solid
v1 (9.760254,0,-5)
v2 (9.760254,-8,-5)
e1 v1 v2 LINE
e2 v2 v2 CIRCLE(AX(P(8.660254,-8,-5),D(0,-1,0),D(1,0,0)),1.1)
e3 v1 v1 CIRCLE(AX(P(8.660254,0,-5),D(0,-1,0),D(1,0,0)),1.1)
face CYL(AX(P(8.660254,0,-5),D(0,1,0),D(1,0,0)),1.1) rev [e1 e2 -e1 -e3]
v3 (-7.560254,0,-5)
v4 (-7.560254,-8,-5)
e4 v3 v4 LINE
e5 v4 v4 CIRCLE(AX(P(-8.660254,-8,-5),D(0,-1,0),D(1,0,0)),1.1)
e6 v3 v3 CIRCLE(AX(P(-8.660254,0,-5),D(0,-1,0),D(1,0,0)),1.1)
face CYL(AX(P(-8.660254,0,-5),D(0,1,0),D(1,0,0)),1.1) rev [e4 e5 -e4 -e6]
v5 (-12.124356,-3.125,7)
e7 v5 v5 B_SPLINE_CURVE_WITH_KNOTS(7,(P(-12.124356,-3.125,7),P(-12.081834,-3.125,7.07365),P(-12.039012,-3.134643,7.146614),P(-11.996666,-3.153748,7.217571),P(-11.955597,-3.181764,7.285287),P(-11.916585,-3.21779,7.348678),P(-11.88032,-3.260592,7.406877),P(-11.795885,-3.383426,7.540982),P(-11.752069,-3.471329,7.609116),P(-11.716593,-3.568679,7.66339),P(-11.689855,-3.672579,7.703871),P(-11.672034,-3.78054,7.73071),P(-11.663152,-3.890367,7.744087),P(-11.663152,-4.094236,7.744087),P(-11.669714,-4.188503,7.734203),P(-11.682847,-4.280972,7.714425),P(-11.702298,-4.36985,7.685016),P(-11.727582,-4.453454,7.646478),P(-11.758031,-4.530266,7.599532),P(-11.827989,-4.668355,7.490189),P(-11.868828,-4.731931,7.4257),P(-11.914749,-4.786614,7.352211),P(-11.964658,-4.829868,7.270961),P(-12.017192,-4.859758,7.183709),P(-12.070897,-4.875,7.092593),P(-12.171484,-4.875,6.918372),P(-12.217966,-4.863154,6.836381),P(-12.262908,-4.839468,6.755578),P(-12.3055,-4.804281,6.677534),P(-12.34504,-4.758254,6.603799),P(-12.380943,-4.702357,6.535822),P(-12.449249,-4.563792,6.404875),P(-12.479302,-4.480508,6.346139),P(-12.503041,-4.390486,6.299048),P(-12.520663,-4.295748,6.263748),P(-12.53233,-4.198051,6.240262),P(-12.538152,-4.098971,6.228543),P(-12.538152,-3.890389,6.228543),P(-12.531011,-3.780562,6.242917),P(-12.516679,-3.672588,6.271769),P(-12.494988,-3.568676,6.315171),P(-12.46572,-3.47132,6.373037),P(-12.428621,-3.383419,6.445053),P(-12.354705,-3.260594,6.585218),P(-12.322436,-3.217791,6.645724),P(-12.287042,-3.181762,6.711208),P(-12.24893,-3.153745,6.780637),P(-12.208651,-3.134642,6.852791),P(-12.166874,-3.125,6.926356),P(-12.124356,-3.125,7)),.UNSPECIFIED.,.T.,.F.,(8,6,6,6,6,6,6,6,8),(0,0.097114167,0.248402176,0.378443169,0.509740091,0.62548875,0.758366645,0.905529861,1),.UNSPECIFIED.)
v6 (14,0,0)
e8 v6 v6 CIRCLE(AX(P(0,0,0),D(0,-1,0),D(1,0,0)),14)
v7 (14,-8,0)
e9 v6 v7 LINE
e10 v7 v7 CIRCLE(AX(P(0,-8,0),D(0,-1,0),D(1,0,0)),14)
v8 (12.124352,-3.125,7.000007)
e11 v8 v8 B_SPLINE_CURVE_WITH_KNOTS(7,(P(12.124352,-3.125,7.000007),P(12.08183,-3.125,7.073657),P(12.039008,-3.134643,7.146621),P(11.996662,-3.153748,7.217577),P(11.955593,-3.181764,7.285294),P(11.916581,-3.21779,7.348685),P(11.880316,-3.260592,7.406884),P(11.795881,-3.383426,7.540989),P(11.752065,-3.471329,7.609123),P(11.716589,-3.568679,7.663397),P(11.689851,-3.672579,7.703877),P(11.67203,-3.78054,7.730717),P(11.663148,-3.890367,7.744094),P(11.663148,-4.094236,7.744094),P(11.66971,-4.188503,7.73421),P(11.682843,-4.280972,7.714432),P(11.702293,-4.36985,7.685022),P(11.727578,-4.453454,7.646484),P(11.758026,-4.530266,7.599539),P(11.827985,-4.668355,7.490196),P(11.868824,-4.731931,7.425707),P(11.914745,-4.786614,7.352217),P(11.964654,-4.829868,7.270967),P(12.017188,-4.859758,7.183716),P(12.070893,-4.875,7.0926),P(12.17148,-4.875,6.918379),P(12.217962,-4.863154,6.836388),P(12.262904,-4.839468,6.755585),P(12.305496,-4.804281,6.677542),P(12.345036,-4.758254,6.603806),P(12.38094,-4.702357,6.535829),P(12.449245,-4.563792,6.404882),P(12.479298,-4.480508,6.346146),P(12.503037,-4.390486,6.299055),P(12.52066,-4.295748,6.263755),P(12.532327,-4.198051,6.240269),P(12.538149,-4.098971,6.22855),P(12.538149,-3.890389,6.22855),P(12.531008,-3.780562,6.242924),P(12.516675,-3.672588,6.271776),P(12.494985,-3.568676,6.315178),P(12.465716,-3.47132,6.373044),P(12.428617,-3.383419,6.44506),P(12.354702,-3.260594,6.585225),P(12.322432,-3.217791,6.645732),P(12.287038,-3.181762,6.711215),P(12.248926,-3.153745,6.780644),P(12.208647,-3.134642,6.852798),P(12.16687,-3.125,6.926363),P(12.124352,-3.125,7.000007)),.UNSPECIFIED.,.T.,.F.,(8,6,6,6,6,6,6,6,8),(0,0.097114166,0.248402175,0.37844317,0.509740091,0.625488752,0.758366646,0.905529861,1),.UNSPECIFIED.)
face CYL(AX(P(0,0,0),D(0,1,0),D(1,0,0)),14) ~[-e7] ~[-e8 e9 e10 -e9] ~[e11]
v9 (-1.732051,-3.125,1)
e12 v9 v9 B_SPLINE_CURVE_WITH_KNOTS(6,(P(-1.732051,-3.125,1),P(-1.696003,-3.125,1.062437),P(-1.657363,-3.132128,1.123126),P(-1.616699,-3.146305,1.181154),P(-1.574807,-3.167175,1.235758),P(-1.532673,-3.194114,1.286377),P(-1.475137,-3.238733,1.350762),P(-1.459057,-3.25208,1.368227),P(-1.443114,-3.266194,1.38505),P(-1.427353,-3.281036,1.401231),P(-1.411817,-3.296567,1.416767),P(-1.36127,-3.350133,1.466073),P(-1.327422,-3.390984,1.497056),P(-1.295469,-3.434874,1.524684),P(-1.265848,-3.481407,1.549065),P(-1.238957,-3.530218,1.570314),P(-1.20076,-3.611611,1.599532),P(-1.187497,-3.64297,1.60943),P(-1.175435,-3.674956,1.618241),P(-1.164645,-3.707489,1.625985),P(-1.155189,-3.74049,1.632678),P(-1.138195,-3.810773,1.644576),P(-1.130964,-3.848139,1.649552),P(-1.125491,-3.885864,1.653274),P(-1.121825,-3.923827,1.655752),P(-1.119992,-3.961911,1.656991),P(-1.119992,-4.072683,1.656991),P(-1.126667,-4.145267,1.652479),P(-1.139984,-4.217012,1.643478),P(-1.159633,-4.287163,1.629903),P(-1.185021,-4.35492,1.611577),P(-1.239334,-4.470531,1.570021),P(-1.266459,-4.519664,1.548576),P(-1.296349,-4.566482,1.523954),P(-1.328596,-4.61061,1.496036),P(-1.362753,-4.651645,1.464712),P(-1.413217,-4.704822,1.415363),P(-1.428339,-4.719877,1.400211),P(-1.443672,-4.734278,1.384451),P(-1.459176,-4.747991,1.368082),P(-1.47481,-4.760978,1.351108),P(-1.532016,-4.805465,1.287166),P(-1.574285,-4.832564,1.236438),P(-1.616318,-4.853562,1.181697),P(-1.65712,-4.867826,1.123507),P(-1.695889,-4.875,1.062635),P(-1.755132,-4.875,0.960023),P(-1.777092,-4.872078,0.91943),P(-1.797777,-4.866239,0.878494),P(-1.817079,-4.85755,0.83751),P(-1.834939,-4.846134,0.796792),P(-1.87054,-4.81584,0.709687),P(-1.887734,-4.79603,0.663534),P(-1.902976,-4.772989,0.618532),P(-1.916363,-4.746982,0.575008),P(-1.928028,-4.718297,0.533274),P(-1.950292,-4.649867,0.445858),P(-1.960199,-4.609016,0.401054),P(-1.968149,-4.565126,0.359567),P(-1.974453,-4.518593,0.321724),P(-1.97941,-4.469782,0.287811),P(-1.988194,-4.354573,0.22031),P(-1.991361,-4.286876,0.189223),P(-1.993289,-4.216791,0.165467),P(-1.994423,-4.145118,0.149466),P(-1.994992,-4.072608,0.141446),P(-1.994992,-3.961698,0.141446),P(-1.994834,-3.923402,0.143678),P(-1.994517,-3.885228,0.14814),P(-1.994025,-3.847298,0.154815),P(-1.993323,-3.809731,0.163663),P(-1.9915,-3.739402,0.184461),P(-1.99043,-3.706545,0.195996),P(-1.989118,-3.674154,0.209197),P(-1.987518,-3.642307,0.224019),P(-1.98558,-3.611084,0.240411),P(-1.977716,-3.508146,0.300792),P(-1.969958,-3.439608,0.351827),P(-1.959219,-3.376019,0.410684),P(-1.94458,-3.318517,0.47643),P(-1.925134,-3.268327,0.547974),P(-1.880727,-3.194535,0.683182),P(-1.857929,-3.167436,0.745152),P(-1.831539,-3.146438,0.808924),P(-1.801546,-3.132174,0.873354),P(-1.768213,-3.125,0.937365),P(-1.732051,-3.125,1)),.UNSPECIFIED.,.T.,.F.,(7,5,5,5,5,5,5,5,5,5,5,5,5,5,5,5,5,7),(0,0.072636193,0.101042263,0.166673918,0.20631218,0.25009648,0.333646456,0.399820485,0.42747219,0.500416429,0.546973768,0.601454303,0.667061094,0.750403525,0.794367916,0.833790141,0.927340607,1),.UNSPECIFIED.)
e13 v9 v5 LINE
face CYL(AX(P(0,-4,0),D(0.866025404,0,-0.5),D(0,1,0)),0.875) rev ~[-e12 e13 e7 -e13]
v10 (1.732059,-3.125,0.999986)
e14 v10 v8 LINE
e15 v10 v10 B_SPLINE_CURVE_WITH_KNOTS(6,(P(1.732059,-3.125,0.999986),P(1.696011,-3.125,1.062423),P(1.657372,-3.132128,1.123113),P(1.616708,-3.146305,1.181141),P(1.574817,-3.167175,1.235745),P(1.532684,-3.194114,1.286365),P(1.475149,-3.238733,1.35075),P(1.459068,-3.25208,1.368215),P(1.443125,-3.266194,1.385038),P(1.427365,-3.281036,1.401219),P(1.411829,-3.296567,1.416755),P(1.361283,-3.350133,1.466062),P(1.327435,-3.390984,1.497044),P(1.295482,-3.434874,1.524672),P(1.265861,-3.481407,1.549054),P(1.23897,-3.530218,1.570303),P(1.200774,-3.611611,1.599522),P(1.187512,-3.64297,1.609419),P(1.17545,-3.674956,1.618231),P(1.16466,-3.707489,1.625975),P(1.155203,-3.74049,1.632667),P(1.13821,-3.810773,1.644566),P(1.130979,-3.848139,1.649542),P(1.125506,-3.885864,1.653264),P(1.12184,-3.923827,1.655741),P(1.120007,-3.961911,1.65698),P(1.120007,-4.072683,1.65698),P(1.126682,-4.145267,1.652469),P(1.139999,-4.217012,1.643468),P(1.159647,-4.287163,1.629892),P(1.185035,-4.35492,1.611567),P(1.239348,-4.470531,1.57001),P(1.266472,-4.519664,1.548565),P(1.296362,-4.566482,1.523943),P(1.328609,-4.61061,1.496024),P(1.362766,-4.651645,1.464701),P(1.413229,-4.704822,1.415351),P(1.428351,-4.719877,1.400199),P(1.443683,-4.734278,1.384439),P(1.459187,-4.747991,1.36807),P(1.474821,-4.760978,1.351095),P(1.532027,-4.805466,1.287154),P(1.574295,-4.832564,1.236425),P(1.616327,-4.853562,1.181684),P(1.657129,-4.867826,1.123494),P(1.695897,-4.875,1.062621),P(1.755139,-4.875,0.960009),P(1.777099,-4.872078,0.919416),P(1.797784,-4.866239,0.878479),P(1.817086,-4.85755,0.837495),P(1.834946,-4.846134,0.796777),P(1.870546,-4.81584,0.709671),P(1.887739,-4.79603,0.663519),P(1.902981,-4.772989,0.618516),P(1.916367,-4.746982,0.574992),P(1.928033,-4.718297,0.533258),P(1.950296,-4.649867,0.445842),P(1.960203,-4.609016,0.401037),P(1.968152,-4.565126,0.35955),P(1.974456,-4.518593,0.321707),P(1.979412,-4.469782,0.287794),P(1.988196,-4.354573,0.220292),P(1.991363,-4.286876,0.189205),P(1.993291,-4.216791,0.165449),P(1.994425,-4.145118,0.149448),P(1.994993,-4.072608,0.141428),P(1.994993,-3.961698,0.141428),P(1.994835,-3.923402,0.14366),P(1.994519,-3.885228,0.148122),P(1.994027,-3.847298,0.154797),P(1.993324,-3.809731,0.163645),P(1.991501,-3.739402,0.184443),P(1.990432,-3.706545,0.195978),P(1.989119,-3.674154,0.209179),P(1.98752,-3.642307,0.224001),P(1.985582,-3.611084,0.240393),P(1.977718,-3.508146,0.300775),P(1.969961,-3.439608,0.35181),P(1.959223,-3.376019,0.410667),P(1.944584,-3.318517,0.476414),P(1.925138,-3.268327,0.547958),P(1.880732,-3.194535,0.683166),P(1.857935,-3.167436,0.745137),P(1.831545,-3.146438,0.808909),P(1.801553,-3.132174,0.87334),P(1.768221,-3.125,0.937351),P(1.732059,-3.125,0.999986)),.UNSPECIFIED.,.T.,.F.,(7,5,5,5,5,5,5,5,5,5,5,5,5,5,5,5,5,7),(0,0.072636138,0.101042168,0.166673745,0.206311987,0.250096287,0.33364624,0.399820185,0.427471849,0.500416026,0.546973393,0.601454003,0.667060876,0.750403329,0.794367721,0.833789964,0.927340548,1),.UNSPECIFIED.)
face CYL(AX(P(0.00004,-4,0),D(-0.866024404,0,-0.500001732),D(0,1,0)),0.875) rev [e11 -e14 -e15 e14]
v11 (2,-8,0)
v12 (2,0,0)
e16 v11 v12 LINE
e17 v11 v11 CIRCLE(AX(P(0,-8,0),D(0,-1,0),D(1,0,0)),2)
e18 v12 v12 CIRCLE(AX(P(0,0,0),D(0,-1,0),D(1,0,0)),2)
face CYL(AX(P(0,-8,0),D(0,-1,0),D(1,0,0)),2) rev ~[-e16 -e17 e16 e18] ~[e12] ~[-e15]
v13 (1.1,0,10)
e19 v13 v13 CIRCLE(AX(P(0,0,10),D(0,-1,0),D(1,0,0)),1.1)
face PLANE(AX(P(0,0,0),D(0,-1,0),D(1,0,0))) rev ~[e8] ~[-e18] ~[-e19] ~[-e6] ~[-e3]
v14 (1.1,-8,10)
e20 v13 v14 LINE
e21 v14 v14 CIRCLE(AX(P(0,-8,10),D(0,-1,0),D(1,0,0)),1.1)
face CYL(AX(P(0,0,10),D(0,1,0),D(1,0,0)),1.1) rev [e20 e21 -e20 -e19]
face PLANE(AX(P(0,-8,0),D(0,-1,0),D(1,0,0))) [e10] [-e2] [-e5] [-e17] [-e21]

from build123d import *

# Parameters (mm, degrees)
F0_R     = 14
F0_R_2   = 1.1
F1_DEPTH = 8
F2_R     = 2
F3_DEPTH = 8.001
F6_R     = 0.875
F7_DEPTH = 19.125355653


# Not quite as in the source:
# - a pattern or mirror of a feature is missing from the dataset's text; its kind, count and spacing are read off the source's solid


with BuildPart() as f1:
    # F0 (on Front) → F1 (new body)
    with BuildSketch(Plane.XZ):
        Circle(F0_R)
        with Locations((-8.6602540378, -5)):
            Circle(F0_R_2, mode=Mode.SUBTRACT)
        with Locations((8.6602540378, -5)):
            Circle(F0_R_2, mode=Mode.SUBTRACT)
        with Locations((0, 10)):
            Circle(F0_R_2, mode=Mode.SUBTRACT)
    extrude(amount=F1_DEPTH)

    # F2 (on face) → F3 (cut, through all)
    with BuildSketch(Plane.XZ.offset(8)):
        Circle(F2_R)
    extrude(amount=-F3_DEPTH, mode=Mode.SUBTRACT)

    # F6 (on line) → F7 (cut, through all)
    with BuildSketch(Plane(origin=(0, 0, 0), x_dir=(0, 1, 0), z_dir=(0.8660254038, 0, -0.5))):
        with Locations((-4, 0)):
            Circle(F6_R)
    f7 = extrude(amount=-F7_DEPTH, mode=Mode.SUBTRACT)

    # F7_copies: F7 across plane
    add(f7.mirror(Plane(origin=(2e-05, 0, 0), x_dir=(-1e-06, 0, 1), z_dir=(1, 0, 1e-06))), mode=Mode.SUBTRACT)


solid = f1.part
